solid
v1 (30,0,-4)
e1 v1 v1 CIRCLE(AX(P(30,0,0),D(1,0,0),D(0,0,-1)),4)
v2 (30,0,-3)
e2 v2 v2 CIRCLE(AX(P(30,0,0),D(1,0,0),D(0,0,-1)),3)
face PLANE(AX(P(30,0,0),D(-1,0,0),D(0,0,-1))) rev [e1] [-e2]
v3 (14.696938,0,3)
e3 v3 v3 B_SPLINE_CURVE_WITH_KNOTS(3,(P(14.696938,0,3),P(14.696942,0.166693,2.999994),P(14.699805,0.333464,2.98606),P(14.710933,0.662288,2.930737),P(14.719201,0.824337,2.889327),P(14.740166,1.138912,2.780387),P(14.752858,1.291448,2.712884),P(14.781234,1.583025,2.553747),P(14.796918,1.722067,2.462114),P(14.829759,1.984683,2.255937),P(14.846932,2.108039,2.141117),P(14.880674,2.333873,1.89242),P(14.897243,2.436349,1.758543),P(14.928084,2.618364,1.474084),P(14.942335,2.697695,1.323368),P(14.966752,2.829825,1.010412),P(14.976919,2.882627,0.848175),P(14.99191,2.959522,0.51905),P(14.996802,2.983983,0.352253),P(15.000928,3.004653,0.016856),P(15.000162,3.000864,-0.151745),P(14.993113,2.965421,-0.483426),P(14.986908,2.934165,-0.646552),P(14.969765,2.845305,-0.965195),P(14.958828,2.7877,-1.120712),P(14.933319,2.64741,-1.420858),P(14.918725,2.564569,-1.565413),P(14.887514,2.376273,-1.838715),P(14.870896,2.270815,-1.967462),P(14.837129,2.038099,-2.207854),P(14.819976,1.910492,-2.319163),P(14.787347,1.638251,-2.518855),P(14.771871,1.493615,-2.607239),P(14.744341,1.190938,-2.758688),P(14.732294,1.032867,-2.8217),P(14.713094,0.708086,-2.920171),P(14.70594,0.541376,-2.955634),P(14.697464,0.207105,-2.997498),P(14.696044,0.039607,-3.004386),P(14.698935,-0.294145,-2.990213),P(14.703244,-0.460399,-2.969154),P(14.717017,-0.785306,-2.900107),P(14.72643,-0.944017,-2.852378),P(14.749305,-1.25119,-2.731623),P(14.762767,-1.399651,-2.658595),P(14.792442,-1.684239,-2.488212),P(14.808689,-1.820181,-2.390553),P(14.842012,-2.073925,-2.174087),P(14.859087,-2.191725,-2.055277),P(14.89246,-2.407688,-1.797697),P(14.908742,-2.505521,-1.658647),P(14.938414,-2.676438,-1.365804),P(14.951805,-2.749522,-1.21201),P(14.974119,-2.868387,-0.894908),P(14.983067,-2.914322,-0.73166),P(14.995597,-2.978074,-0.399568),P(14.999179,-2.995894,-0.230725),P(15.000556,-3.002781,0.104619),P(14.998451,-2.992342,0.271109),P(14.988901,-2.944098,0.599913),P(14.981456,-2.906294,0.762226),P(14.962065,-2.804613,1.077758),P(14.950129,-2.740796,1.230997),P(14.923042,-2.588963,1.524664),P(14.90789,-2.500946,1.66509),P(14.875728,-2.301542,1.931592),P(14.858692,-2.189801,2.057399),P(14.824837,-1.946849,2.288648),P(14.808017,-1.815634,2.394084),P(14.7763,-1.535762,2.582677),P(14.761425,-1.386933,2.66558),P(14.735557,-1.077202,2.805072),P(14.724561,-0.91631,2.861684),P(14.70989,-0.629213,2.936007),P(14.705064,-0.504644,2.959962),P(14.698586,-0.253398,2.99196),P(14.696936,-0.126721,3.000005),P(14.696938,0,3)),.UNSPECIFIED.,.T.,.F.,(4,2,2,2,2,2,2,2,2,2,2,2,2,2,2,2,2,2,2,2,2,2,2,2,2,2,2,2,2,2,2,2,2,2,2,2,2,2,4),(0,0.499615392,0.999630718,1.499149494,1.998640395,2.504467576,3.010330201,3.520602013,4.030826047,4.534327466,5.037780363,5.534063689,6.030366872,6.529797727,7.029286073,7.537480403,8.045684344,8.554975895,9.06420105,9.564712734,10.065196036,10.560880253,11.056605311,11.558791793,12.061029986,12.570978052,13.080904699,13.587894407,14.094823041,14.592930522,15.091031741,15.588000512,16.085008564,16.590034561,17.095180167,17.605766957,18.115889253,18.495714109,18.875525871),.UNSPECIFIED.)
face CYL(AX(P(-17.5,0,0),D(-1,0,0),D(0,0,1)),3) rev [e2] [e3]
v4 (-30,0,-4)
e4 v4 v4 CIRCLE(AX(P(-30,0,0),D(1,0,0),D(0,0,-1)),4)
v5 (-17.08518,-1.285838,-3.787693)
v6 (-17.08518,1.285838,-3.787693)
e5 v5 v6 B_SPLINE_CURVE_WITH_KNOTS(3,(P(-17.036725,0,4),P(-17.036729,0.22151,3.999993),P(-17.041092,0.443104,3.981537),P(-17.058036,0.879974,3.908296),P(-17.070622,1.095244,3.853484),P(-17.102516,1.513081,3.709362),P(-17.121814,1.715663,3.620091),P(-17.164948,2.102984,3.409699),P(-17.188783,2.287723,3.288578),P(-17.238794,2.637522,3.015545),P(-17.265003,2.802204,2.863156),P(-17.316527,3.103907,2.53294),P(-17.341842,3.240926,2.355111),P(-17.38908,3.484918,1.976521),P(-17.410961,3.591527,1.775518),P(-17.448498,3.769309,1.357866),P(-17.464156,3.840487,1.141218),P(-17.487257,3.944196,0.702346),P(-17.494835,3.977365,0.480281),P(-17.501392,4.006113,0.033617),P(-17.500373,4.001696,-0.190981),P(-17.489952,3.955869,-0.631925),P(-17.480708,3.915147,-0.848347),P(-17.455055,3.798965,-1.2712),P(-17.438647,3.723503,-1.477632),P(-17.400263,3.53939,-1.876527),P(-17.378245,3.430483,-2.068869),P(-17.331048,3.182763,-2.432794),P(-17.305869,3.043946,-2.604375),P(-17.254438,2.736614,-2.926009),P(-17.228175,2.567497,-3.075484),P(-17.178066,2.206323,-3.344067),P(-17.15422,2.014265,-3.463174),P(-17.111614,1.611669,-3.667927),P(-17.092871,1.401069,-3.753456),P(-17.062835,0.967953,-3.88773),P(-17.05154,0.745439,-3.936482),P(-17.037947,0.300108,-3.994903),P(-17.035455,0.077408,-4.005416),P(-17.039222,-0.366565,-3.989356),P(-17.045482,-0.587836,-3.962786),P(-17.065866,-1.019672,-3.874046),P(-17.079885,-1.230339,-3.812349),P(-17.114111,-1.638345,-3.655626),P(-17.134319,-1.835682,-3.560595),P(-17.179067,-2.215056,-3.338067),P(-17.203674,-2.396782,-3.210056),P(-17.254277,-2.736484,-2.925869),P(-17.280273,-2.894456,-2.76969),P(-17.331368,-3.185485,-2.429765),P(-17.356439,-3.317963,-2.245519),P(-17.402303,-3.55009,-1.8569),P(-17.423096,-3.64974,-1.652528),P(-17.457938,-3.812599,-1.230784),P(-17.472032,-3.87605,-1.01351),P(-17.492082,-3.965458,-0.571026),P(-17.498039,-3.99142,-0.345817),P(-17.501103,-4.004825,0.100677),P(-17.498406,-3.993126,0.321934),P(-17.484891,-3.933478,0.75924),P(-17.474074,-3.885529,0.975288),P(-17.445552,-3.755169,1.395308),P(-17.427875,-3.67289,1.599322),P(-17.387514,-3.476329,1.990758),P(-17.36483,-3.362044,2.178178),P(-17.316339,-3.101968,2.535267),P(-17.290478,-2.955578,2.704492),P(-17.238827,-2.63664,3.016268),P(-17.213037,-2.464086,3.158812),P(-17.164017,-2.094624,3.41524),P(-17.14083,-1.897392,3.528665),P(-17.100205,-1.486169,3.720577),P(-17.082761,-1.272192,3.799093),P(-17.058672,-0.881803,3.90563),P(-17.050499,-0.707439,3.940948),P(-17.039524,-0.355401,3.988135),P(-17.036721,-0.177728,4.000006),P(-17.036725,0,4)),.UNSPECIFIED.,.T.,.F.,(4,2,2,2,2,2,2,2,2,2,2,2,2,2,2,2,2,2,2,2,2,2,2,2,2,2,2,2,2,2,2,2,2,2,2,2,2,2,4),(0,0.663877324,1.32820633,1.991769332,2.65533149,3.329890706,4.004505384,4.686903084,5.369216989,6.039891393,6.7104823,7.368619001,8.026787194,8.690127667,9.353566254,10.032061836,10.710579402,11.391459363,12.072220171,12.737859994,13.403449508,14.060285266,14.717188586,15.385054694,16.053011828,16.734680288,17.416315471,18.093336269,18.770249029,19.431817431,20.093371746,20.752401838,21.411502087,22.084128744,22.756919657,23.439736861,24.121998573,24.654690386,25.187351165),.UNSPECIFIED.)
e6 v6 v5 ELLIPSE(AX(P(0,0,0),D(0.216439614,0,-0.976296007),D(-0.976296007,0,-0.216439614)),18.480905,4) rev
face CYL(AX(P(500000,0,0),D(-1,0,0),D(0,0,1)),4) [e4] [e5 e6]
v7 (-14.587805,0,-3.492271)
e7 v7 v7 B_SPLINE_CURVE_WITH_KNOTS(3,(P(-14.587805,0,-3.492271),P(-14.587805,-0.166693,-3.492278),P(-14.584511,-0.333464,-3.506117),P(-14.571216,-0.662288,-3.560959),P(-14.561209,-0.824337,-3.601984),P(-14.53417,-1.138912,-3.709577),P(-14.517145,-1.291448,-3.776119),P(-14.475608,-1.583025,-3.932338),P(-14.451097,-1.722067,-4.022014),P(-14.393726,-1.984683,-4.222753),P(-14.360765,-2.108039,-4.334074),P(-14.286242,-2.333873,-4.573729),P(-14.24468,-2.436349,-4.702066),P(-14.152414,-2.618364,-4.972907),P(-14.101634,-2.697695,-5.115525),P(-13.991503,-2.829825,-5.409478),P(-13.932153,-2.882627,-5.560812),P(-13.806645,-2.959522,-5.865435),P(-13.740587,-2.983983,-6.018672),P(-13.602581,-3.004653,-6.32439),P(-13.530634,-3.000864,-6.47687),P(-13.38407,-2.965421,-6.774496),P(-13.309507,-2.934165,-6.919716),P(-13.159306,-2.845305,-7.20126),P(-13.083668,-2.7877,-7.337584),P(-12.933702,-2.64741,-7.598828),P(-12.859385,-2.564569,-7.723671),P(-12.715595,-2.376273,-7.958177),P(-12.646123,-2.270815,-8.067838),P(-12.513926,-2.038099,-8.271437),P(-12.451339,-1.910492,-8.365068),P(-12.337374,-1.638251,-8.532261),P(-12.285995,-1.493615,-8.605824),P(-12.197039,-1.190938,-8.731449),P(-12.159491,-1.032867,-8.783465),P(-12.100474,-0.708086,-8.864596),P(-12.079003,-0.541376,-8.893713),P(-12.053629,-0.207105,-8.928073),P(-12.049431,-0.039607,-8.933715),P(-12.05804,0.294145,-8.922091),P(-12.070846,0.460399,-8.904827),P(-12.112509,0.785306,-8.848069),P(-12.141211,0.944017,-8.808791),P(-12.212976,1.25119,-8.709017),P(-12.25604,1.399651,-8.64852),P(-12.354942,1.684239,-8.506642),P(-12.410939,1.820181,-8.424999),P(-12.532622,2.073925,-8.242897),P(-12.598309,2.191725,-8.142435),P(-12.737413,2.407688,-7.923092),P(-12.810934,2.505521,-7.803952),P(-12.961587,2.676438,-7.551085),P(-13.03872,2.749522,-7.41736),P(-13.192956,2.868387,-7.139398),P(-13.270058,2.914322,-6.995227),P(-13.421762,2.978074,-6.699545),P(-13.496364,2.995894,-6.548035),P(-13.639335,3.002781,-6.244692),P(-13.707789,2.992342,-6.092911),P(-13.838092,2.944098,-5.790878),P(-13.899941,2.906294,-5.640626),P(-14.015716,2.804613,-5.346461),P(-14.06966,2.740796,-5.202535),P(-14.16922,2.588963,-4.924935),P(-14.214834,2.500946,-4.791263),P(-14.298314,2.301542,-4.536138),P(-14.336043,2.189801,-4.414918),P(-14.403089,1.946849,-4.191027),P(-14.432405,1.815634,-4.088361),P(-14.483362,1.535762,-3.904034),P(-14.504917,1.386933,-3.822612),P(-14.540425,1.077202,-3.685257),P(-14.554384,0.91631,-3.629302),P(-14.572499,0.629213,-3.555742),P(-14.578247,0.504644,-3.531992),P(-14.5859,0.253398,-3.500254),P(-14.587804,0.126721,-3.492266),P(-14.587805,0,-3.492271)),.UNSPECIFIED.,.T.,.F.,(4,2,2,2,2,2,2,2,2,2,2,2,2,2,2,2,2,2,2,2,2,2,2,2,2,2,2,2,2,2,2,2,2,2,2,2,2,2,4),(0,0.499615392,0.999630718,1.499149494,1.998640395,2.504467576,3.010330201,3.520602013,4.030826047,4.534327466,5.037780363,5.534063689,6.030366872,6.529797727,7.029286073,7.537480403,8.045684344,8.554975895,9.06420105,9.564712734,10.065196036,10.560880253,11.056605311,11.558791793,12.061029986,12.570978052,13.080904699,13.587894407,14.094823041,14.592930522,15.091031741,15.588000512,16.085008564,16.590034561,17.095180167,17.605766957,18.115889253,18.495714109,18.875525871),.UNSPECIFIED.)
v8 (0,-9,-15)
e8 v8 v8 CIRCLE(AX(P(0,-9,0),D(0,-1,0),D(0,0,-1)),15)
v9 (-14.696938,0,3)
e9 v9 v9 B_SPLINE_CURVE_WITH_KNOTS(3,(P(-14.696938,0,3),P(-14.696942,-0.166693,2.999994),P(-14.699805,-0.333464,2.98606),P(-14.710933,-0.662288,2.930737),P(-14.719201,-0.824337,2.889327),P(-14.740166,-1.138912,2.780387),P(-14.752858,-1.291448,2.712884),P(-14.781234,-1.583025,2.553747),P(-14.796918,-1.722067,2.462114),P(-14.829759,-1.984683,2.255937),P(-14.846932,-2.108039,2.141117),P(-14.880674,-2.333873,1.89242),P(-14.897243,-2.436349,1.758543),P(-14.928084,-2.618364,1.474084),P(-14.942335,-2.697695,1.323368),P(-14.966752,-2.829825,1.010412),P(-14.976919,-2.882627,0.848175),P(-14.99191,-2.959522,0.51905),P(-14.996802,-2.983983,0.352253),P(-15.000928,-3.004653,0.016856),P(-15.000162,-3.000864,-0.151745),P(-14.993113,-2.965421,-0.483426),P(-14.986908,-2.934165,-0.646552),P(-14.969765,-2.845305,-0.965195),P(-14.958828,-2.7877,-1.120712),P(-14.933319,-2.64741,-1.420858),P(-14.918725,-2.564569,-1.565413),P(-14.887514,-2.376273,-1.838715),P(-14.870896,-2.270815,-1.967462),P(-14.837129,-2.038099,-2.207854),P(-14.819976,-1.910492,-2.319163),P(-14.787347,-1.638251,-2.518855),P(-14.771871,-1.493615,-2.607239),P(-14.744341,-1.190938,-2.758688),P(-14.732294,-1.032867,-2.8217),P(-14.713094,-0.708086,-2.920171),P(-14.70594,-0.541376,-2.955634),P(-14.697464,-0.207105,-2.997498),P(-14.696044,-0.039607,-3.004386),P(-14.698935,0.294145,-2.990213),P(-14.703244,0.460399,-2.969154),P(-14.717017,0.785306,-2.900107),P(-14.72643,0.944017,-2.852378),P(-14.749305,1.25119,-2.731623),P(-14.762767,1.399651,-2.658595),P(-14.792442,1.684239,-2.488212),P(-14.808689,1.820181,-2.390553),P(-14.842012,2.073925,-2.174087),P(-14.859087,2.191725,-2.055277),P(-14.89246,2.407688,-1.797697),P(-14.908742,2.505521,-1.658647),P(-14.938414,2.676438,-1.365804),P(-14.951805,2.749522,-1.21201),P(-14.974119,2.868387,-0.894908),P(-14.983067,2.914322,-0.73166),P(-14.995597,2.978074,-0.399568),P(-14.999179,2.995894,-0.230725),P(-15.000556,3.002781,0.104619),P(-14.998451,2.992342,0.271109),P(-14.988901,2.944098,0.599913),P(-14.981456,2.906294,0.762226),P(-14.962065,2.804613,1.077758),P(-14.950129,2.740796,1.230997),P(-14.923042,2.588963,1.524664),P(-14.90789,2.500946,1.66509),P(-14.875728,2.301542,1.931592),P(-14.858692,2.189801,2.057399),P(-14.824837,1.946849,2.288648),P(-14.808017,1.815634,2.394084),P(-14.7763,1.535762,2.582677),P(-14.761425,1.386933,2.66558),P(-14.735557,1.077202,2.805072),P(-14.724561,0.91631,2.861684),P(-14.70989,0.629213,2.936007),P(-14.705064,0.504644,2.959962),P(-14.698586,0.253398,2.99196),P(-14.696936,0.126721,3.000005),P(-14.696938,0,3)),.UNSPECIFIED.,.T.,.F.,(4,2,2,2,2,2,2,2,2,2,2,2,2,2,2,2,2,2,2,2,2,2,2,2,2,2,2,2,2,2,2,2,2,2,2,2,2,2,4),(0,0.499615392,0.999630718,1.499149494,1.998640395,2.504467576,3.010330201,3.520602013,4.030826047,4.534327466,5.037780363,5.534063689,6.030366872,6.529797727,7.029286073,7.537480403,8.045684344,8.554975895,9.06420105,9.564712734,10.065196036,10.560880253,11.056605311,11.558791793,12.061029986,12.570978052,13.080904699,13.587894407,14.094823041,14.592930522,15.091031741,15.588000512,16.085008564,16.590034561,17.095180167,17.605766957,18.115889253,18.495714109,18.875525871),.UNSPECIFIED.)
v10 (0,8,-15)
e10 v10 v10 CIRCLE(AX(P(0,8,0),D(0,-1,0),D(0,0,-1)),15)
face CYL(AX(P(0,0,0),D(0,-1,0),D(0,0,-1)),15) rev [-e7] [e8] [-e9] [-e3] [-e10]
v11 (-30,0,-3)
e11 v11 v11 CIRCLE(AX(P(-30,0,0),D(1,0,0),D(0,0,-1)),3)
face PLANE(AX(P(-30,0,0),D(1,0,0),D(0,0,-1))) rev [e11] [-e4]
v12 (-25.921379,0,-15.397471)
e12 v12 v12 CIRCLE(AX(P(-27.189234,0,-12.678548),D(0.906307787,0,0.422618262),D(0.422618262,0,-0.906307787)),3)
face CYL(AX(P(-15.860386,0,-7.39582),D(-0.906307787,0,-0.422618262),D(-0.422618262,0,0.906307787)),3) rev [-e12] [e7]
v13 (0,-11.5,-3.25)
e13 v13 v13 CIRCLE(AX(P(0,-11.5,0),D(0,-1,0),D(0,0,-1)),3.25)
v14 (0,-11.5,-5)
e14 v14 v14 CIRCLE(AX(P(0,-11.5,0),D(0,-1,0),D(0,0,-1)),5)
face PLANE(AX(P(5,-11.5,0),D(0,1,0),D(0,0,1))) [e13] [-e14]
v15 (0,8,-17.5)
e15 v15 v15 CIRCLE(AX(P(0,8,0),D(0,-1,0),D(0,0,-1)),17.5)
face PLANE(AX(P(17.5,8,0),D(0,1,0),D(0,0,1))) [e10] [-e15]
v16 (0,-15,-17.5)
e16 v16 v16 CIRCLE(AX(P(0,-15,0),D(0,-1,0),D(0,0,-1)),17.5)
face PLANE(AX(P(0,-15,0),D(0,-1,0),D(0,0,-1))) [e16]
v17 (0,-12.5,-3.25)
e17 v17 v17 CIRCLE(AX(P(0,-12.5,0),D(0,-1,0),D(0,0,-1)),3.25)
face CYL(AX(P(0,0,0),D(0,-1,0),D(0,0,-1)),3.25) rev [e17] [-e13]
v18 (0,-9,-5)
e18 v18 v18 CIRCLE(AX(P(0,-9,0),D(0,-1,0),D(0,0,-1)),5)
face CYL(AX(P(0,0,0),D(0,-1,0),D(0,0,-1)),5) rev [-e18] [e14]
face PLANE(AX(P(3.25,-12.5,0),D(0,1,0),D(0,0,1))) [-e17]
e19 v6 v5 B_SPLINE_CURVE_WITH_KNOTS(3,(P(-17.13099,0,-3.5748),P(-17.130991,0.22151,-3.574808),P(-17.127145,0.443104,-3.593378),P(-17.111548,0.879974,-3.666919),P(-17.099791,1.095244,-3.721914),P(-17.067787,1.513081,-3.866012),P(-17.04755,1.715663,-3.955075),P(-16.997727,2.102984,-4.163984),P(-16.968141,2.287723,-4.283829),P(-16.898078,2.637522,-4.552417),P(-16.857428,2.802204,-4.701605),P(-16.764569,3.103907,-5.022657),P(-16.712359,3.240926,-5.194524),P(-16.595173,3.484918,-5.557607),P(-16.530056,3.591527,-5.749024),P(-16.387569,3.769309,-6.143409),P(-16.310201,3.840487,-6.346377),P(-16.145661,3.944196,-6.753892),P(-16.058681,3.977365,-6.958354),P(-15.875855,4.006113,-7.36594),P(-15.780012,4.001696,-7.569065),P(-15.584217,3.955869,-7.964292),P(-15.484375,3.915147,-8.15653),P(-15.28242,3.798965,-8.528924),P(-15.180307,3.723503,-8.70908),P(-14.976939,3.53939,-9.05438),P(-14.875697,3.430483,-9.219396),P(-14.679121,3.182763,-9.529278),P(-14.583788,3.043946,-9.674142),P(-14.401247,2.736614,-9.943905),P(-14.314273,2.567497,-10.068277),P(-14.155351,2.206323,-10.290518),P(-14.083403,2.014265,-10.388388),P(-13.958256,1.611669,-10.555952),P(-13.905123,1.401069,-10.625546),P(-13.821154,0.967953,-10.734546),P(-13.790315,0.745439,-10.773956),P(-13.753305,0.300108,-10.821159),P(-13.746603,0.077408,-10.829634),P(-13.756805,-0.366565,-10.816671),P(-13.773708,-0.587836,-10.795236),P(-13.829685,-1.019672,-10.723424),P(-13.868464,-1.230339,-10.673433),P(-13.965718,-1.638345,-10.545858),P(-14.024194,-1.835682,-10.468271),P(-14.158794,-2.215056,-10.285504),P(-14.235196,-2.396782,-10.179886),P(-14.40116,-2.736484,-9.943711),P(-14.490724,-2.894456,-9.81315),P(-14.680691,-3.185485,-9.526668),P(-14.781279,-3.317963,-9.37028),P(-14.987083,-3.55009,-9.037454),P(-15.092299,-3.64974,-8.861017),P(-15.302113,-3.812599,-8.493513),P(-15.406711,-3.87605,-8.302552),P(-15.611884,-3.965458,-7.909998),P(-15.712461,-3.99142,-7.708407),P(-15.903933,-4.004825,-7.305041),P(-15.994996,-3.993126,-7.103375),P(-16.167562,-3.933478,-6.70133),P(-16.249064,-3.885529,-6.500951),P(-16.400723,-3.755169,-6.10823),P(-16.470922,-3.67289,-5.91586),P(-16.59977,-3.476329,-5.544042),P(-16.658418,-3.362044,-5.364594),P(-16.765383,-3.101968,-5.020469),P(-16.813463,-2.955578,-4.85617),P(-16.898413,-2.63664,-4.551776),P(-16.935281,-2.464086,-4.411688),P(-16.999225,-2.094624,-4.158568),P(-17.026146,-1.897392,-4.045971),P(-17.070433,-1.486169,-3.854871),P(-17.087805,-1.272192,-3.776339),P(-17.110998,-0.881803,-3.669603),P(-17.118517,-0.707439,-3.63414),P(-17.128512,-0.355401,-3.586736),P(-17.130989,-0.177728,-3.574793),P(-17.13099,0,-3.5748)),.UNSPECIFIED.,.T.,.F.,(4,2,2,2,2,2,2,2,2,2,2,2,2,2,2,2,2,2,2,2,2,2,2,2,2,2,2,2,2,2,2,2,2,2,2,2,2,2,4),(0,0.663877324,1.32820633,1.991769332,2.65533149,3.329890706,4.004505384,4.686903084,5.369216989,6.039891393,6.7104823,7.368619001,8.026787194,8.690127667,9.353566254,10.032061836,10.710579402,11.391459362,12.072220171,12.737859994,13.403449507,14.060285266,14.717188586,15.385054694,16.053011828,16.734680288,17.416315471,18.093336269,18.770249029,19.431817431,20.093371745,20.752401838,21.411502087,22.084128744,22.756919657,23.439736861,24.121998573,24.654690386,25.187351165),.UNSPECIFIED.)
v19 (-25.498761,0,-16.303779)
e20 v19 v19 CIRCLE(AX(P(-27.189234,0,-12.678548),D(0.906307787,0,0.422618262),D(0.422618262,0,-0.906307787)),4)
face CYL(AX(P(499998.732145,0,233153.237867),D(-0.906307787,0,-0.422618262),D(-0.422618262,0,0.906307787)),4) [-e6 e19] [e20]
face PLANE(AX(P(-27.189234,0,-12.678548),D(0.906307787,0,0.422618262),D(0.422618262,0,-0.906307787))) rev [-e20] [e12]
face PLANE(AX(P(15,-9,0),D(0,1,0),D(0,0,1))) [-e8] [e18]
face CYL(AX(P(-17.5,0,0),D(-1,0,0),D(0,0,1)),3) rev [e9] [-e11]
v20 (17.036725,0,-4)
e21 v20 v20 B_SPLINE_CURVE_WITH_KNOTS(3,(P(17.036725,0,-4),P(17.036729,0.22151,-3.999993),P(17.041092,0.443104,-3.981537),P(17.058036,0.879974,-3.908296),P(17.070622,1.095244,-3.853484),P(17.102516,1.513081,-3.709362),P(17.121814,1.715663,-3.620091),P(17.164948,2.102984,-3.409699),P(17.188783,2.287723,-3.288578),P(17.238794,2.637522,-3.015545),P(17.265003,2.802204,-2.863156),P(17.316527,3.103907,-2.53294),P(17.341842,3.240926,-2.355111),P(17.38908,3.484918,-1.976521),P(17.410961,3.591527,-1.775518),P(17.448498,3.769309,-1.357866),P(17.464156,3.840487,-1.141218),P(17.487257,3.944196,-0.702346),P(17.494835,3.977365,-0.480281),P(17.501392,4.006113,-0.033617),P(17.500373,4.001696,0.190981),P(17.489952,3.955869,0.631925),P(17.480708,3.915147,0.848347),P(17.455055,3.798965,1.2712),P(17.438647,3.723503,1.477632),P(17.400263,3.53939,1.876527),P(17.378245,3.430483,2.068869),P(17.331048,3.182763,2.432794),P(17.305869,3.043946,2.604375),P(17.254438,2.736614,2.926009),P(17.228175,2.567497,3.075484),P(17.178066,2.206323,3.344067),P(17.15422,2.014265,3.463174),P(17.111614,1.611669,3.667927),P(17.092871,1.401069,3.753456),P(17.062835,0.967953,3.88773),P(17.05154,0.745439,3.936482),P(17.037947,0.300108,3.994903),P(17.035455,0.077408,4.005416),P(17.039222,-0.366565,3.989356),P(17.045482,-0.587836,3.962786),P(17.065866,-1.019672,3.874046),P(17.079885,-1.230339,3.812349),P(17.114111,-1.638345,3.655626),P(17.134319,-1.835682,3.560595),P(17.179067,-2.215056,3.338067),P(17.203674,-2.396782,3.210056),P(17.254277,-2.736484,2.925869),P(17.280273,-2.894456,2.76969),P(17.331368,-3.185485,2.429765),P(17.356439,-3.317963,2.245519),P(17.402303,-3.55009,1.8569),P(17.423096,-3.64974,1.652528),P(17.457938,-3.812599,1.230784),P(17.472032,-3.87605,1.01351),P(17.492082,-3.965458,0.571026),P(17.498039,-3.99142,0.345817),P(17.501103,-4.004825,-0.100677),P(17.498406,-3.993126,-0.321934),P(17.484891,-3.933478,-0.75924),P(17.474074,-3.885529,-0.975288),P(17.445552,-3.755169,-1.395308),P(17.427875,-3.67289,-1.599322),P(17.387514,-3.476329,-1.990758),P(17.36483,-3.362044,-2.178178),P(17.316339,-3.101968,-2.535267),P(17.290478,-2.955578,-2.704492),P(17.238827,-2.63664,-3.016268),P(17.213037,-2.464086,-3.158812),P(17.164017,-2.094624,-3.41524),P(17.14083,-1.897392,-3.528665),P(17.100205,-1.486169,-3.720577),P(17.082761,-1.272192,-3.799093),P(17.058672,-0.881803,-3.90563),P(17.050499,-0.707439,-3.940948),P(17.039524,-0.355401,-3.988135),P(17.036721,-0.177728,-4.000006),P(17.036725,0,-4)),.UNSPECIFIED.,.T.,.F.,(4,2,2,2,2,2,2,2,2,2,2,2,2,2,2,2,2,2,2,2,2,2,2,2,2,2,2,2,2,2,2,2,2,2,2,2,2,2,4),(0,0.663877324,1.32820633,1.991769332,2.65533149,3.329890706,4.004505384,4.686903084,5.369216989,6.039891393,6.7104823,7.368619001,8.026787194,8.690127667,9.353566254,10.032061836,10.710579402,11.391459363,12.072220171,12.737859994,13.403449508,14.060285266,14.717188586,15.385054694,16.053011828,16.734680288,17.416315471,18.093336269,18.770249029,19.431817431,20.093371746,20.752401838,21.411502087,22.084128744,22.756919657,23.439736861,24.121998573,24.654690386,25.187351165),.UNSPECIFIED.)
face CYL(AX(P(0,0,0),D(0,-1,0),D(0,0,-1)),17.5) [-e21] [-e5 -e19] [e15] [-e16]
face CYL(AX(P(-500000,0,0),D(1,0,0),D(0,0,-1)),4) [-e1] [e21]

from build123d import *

# Parameters (mm, degrees)
FUROS_GUIA_COM_6_0MM1_D       = 6
FUROS_GUIA_COM_6_0MM2_REACH   = 46.246
FUROS_GUIA_COM_6_0MM2_BORE_R  = 3
RESSALTO_EXTRUS_O1_REACH      = 60.94
RESSALTO_EXTRUS_O1_END_RADIUS = 17.5
RESSALTO_EXTRUS_O1_START      = -30
ESBO_O4_R                     = 4
ESBO_O4_R_2                   = 3
RESSALTO_EXTRUS_O2_OUTLINE_W  = 1
RESSALTO_EXTRUS_O2_OUTLINE_H  = 12.963481803


# Read off the part's stored shape, not the designer's step: Ressalto-extrusão2
with BuildPart() as part:
    # Esboço1 → Revolução1 (revolve)
    with BuildSketch(Plane.XY, mode=Mode.PRIVATE) as revolu_o1_sk:
        Polygon((0, -15), (17.5, -15), (17.5, 8), (15, 8), (15, -9), (5, -9), (5, -11.5), (3.25, -11.5), (3.25, -12.5), (0, -12.5), align=None)
    revolve(revolu_o1_sk.sketch.rotate(Axis((0, 0, 0), (0, 1, 0)), 90), axis=Axis((0, 0, 0), (0, 1, 0)))

    # Furos-guia com Ø6.0mm1 (through all)
    with Locations(Plane(origin=(-17.5, 0, 0), x_dir=(0, 0, -1), z_dir=(-1, 0, 0))):
        with Locations((0, 0)):
            Hole(FUROS_GUIA_COM_6_0MM1_D / 2)

    # Furos-guia com Ø6.0mm2 bore (on position points) → Furos-guia com Ø6.0mm2 (cut, up to next)
    with BuildSketch(Plane(origin=(-15.860386273, 0, -7.39581958), x_dir=(0.422618261741, 0, -0.906307787037), z_dir=(-0.906307787037, 0, -0.422618261741)), mode=Mode.PRIVATE) as furos_guia_com_6_0mm2_sk1:
        Circle(FUROS_GUIA_COM_6_0MM2_BORE_R)
    furos_guia_com_6_0mm2_tool1 = extrude(furos_guia_com_6_0mm2_sk1.sketch, amount=-FUROS_GUIA_COM_6_0MM2_REACH, mode=Mode.PRIVATE) & part.part
    add(furos_guia_com_6_0mm2_tool1.solids().sort_by_distance((-15.860386, 0, -7.39582))[0], mode=Mode.SUBTRACT)

    # Ressalto-extrusão1: up to this cylinder (the profile starts outside it)
    ressalto_extrus_o1_end = Plane(origin=(0, 0, 0), z_dir=(0, -1, 0)) * Cylinder(RESSALTO_EXTRUS_O1_END_RADIUS, 157.88, mode=Mode.PRIVATE)
    # Esboço4 → Ressalto-extrusão1 (add, up to the surface)
    with BuildSketch(Plane(origin=(0, 0, 0), x_dir=(0, 0, -1), z_dir=(1, 0, 0)).offset(RESSALTO_EXTRUS_O1_START), mode=Mode.PRIVATE) as ressalto_extrus_o1_sk1:
        with Locations(Location((0, 0, 0), (0, 0, 180))):
            Circle(ESBO_O4_R)
        with Locations(Location((0, 0, 0), (0, 0, 180))):
            Circle(ESBO_O4_R_2, mode=Mode.SUBTRACT)
    ressalto_extrus_o1_tool1 = extrude(ressalto_extrus_o1_sk1.sketch, amount=RESSALTO_EXTRUS_O1_REACH, mode=Mode.PRIVATE) - ressalto_extrus_o1_end
    ressalto_extrus_o1 = ressalto_extrus_o1_tool1.solids().sort_by_distance((-30, 0, -3.886863))[0]
    add(ressalto_extrus_o1)

    # Espelhar3: Ressalto-extrusão1 across plane
    add(ressalto_extrus_o1.mirror(Plane(origin=(0, 0, 0), x_dir=(0, 0, 1), z_dir=(1, 0, 0))))

    # Ressalto-extrusão2 outline → Ressalto-extrusão2 (revolve)
    with BuildSketch(Plane(origin=(0, 0, 0), x_dir=(0, 1, 0), z_dir=(0.4226182617407003, 0, -0.9063077870366496))):
        with Locations((3.5, -23.518259099)):
            Rectangle(RESSALTO_EXTRUS_O2_OUTLINE_W, RESSALTO_EXTRUS_O2_OUTLINE_H)
    revolve(axis=Axis((0, 0, 0), (0.9063077870366496, 0, 0.4226182617407003)))


solid = part.part
